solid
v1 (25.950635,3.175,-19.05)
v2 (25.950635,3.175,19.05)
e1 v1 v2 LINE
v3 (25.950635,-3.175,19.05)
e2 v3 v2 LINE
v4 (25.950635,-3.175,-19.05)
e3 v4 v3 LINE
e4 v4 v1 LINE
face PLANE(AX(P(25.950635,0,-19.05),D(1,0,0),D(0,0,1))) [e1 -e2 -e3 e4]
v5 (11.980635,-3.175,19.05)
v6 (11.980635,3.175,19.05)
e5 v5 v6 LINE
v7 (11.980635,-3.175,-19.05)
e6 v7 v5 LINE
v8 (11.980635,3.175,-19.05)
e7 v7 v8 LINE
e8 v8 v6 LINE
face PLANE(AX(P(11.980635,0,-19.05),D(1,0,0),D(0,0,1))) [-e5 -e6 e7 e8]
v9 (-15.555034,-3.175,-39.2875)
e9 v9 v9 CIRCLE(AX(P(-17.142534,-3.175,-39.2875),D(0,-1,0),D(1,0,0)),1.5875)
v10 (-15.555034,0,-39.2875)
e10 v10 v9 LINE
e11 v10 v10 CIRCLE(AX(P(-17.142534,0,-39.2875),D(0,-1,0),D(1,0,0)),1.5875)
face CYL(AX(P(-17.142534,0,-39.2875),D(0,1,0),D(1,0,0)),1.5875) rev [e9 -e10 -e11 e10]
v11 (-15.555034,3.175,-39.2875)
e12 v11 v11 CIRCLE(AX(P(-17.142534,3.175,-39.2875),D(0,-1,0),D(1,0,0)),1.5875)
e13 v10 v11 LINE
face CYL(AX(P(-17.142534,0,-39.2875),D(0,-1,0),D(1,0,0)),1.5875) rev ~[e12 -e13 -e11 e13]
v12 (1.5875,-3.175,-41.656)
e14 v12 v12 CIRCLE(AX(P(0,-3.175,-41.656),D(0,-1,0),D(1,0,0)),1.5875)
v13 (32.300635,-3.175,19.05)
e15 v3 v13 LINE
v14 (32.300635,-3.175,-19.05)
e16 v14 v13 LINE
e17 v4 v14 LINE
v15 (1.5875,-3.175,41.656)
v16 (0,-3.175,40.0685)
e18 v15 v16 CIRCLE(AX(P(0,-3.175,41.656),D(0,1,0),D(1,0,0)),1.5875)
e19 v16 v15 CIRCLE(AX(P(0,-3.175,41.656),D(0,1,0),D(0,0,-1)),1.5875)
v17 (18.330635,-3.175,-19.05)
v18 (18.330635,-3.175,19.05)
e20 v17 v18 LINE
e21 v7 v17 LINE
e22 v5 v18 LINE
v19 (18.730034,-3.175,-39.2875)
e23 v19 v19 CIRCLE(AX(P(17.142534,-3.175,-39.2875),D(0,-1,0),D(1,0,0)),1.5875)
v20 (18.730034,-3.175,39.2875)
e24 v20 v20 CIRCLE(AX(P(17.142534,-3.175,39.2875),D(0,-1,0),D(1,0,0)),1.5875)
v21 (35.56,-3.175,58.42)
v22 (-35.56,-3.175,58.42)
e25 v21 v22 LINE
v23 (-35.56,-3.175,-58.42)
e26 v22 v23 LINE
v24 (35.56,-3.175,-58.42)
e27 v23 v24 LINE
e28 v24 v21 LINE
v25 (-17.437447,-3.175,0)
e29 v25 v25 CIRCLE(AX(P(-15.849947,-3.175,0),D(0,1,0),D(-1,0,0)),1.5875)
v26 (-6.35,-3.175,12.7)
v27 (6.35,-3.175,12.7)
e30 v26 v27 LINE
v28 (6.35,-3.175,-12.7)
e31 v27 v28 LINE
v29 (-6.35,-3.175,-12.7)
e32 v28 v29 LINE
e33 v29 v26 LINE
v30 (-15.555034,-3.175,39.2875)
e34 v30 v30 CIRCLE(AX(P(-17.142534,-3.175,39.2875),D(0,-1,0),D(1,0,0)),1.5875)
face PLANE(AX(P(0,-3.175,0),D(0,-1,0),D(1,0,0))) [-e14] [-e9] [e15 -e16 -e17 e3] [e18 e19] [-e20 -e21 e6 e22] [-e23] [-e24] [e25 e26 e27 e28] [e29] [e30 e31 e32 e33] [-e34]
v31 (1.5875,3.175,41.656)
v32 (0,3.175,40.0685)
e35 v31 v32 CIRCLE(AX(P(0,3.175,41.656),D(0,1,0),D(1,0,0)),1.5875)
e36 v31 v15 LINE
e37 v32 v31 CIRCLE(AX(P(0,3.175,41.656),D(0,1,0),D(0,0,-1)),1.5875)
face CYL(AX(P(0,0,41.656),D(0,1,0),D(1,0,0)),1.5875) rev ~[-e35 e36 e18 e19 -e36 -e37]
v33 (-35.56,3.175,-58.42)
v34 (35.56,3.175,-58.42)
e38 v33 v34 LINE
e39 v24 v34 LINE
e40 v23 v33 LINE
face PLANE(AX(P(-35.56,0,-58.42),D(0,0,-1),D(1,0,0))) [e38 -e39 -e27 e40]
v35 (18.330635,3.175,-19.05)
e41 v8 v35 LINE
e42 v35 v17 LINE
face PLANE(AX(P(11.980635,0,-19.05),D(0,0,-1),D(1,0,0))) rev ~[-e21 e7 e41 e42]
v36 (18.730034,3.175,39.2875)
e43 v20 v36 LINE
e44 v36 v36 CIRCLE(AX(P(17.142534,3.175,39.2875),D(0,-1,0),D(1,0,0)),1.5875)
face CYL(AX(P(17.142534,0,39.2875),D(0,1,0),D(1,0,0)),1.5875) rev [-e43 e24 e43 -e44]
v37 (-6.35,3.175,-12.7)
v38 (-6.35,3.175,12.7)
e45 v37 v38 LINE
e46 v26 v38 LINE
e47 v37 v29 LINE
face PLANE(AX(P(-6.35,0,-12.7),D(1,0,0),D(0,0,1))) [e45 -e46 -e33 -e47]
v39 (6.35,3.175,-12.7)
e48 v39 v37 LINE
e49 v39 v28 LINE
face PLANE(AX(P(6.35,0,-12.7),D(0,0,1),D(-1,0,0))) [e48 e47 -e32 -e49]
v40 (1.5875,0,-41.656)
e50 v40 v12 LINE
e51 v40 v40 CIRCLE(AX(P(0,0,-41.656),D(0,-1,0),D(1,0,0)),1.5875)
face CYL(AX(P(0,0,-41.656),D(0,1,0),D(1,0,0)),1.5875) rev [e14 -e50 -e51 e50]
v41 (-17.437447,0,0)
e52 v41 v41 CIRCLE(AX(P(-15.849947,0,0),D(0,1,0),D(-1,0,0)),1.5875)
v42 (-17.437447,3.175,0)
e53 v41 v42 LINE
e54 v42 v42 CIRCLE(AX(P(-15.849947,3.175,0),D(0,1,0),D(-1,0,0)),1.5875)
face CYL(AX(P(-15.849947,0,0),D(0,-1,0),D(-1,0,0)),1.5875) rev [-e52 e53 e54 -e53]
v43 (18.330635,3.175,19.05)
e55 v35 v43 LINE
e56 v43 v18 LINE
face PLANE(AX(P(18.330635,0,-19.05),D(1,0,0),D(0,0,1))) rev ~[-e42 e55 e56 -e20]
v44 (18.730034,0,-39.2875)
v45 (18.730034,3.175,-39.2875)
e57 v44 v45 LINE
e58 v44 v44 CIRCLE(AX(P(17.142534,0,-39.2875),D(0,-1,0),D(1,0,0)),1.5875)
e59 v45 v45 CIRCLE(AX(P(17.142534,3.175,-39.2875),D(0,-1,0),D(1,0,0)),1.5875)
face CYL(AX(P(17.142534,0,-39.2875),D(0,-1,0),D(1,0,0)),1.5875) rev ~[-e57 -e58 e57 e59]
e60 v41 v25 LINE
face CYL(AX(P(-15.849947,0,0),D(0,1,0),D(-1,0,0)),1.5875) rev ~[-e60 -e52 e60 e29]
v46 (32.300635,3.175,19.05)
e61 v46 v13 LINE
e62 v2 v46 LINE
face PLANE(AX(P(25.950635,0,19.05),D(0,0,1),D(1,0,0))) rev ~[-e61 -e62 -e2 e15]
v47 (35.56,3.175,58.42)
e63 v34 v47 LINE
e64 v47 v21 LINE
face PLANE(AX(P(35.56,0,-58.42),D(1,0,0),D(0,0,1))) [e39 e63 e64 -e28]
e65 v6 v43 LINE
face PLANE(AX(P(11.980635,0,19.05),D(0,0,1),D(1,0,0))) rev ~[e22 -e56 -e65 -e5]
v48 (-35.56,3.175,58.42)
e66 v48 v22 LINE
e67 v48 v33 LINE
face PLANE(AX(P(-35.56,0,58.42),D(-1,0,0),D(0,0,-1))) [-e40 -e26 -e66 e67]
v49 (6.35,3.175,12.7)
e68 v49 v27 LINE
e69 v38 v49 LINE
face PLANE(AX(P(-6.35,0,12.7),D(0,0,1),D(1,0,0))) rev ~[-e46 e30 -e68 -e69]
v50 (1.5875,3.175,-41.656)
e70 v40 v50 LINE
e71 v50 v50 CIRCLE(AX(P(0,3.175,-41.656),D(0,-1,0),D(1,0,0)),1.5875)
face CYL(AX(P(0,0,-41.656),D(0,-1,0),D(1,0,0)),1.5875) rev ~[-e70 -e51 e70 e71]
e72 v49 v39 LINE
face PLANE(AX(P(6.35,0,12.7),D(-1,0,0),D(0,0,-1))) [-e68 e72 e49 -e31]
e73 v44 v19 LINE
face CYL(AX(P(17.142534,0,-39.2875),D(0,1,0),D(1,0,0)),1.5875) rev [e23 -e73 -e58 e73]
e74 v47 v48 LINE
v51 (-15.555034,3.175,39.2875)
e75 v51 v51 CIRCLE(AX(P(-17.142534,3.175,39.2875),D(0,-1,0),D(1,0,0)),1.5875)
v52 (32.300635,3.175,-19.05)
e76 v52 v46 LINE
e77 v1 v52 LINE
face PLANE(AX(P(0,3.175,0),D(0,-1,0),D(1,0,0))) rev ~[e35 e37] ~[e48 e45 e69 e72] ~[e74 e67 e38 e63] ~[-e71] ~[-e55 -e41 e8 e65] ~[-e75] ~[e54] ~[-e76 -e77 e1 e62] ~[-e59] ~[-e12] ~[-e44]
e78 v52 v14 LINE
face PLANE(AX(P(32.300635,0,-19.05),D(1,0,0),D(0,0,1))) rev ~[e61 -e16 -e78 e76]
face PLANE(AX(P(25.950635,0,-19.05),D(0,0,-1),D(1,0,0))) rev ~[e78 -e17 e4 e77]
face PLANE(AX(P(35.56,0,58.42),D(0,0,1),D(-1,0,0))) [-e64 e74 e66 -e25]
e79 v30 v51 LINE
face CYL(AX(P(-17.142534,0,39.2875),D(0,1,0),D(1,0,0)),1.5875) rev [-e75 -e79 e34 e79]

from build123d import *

# Parameters (mm, degrees)
F0_R     = 1.5875
F0_W     = 6.35
F0_H     = 38.1
F1_DEPTH = 3.175
F2_DEPTH = 2.54


# Not quite as in the source:
# - a feature names something its author has since deleted; it is built from what else it names


with BuildPart() as f1:
    # F0 (on Front) → F1 (new body, symmetric)
    with BuildSketch(Plane.XZ):
        Polygon((35.56, -58.42), (35.56, 58.42), (-35.56, 58.42), (-35.56, 0), (-35.56, -58.42), align=None)
        with Locations((-17.1425342897, -39.2875)):
            Circle(F0_R, mode=Mode.SUBTRACT)
        with Locations((0, -41.656)):
            Circle(F0_R, mode=Mode.SUBTRACT)
        with BuildLine():
            ThreePointArc((-14.2624473298, 0), (-15.8499473298, -1.5875), (-17.4374473298, 0))
            ThreePointArc((-17.4374473298, 0), (-15.8499473298, 1.5875), (-14.2624473298, 0))
        make_face(mode=Mode.SUBTRACT)
        Polygon((-6.35, -12.7), (-6.35, 12.7), (0, 12.7), (6.35, 12.7), (6.35, -12.7), align=None, mode=Mode.SUBTRACT)
        with Locations((17.1425342897, -39.2875)):
            Circle(F0_R, mode=Mode.SUBTRACT)
        with Locations((15.1556345809, 0)):
            Rectangle(F0_W, F0_H, mode=Mode.SUBTRACT)
        with Locations((29.1256345809, 0)):
            Rectangle(F0_W, F0_H, mode=Mode.SUBTRACT)
        with Locations((-17.1425342897, 39.2875)):
            Circle(F0_R, mode=Mode.SUBTRACT)
        with BuildLine():
            ThreePointArc((1.5875, 41.656), (1.1225320151, 40.5334679849), (0, 40.0685))
            ThreePointArc((0, 40.0685), (-1.1225320151, 42.7785320151), (1.5875, 41.656))
        make_face(mode=Mode.SUBTRACT)
        with Locations((17.1425342897, 39.2875)):
            Circle(F0_R, mode=Mode.SUBTRACT)
    extrude(amount=F1_DEPTH, both=True)

    # F0 (on Front) → F2 (cut)
    with BuildSketch(Plane.XZ):
        with Locations((15.1556345809, 0)):
            Rectangle(F0_W, F0_H)
        with Locations((29.1256345809, 0)):
            Rectangle(F0_W, F0_H)
    extrude(amount=-F2_DEPTH, mode=Mode.SUBTRACT)


solid = f1.part
